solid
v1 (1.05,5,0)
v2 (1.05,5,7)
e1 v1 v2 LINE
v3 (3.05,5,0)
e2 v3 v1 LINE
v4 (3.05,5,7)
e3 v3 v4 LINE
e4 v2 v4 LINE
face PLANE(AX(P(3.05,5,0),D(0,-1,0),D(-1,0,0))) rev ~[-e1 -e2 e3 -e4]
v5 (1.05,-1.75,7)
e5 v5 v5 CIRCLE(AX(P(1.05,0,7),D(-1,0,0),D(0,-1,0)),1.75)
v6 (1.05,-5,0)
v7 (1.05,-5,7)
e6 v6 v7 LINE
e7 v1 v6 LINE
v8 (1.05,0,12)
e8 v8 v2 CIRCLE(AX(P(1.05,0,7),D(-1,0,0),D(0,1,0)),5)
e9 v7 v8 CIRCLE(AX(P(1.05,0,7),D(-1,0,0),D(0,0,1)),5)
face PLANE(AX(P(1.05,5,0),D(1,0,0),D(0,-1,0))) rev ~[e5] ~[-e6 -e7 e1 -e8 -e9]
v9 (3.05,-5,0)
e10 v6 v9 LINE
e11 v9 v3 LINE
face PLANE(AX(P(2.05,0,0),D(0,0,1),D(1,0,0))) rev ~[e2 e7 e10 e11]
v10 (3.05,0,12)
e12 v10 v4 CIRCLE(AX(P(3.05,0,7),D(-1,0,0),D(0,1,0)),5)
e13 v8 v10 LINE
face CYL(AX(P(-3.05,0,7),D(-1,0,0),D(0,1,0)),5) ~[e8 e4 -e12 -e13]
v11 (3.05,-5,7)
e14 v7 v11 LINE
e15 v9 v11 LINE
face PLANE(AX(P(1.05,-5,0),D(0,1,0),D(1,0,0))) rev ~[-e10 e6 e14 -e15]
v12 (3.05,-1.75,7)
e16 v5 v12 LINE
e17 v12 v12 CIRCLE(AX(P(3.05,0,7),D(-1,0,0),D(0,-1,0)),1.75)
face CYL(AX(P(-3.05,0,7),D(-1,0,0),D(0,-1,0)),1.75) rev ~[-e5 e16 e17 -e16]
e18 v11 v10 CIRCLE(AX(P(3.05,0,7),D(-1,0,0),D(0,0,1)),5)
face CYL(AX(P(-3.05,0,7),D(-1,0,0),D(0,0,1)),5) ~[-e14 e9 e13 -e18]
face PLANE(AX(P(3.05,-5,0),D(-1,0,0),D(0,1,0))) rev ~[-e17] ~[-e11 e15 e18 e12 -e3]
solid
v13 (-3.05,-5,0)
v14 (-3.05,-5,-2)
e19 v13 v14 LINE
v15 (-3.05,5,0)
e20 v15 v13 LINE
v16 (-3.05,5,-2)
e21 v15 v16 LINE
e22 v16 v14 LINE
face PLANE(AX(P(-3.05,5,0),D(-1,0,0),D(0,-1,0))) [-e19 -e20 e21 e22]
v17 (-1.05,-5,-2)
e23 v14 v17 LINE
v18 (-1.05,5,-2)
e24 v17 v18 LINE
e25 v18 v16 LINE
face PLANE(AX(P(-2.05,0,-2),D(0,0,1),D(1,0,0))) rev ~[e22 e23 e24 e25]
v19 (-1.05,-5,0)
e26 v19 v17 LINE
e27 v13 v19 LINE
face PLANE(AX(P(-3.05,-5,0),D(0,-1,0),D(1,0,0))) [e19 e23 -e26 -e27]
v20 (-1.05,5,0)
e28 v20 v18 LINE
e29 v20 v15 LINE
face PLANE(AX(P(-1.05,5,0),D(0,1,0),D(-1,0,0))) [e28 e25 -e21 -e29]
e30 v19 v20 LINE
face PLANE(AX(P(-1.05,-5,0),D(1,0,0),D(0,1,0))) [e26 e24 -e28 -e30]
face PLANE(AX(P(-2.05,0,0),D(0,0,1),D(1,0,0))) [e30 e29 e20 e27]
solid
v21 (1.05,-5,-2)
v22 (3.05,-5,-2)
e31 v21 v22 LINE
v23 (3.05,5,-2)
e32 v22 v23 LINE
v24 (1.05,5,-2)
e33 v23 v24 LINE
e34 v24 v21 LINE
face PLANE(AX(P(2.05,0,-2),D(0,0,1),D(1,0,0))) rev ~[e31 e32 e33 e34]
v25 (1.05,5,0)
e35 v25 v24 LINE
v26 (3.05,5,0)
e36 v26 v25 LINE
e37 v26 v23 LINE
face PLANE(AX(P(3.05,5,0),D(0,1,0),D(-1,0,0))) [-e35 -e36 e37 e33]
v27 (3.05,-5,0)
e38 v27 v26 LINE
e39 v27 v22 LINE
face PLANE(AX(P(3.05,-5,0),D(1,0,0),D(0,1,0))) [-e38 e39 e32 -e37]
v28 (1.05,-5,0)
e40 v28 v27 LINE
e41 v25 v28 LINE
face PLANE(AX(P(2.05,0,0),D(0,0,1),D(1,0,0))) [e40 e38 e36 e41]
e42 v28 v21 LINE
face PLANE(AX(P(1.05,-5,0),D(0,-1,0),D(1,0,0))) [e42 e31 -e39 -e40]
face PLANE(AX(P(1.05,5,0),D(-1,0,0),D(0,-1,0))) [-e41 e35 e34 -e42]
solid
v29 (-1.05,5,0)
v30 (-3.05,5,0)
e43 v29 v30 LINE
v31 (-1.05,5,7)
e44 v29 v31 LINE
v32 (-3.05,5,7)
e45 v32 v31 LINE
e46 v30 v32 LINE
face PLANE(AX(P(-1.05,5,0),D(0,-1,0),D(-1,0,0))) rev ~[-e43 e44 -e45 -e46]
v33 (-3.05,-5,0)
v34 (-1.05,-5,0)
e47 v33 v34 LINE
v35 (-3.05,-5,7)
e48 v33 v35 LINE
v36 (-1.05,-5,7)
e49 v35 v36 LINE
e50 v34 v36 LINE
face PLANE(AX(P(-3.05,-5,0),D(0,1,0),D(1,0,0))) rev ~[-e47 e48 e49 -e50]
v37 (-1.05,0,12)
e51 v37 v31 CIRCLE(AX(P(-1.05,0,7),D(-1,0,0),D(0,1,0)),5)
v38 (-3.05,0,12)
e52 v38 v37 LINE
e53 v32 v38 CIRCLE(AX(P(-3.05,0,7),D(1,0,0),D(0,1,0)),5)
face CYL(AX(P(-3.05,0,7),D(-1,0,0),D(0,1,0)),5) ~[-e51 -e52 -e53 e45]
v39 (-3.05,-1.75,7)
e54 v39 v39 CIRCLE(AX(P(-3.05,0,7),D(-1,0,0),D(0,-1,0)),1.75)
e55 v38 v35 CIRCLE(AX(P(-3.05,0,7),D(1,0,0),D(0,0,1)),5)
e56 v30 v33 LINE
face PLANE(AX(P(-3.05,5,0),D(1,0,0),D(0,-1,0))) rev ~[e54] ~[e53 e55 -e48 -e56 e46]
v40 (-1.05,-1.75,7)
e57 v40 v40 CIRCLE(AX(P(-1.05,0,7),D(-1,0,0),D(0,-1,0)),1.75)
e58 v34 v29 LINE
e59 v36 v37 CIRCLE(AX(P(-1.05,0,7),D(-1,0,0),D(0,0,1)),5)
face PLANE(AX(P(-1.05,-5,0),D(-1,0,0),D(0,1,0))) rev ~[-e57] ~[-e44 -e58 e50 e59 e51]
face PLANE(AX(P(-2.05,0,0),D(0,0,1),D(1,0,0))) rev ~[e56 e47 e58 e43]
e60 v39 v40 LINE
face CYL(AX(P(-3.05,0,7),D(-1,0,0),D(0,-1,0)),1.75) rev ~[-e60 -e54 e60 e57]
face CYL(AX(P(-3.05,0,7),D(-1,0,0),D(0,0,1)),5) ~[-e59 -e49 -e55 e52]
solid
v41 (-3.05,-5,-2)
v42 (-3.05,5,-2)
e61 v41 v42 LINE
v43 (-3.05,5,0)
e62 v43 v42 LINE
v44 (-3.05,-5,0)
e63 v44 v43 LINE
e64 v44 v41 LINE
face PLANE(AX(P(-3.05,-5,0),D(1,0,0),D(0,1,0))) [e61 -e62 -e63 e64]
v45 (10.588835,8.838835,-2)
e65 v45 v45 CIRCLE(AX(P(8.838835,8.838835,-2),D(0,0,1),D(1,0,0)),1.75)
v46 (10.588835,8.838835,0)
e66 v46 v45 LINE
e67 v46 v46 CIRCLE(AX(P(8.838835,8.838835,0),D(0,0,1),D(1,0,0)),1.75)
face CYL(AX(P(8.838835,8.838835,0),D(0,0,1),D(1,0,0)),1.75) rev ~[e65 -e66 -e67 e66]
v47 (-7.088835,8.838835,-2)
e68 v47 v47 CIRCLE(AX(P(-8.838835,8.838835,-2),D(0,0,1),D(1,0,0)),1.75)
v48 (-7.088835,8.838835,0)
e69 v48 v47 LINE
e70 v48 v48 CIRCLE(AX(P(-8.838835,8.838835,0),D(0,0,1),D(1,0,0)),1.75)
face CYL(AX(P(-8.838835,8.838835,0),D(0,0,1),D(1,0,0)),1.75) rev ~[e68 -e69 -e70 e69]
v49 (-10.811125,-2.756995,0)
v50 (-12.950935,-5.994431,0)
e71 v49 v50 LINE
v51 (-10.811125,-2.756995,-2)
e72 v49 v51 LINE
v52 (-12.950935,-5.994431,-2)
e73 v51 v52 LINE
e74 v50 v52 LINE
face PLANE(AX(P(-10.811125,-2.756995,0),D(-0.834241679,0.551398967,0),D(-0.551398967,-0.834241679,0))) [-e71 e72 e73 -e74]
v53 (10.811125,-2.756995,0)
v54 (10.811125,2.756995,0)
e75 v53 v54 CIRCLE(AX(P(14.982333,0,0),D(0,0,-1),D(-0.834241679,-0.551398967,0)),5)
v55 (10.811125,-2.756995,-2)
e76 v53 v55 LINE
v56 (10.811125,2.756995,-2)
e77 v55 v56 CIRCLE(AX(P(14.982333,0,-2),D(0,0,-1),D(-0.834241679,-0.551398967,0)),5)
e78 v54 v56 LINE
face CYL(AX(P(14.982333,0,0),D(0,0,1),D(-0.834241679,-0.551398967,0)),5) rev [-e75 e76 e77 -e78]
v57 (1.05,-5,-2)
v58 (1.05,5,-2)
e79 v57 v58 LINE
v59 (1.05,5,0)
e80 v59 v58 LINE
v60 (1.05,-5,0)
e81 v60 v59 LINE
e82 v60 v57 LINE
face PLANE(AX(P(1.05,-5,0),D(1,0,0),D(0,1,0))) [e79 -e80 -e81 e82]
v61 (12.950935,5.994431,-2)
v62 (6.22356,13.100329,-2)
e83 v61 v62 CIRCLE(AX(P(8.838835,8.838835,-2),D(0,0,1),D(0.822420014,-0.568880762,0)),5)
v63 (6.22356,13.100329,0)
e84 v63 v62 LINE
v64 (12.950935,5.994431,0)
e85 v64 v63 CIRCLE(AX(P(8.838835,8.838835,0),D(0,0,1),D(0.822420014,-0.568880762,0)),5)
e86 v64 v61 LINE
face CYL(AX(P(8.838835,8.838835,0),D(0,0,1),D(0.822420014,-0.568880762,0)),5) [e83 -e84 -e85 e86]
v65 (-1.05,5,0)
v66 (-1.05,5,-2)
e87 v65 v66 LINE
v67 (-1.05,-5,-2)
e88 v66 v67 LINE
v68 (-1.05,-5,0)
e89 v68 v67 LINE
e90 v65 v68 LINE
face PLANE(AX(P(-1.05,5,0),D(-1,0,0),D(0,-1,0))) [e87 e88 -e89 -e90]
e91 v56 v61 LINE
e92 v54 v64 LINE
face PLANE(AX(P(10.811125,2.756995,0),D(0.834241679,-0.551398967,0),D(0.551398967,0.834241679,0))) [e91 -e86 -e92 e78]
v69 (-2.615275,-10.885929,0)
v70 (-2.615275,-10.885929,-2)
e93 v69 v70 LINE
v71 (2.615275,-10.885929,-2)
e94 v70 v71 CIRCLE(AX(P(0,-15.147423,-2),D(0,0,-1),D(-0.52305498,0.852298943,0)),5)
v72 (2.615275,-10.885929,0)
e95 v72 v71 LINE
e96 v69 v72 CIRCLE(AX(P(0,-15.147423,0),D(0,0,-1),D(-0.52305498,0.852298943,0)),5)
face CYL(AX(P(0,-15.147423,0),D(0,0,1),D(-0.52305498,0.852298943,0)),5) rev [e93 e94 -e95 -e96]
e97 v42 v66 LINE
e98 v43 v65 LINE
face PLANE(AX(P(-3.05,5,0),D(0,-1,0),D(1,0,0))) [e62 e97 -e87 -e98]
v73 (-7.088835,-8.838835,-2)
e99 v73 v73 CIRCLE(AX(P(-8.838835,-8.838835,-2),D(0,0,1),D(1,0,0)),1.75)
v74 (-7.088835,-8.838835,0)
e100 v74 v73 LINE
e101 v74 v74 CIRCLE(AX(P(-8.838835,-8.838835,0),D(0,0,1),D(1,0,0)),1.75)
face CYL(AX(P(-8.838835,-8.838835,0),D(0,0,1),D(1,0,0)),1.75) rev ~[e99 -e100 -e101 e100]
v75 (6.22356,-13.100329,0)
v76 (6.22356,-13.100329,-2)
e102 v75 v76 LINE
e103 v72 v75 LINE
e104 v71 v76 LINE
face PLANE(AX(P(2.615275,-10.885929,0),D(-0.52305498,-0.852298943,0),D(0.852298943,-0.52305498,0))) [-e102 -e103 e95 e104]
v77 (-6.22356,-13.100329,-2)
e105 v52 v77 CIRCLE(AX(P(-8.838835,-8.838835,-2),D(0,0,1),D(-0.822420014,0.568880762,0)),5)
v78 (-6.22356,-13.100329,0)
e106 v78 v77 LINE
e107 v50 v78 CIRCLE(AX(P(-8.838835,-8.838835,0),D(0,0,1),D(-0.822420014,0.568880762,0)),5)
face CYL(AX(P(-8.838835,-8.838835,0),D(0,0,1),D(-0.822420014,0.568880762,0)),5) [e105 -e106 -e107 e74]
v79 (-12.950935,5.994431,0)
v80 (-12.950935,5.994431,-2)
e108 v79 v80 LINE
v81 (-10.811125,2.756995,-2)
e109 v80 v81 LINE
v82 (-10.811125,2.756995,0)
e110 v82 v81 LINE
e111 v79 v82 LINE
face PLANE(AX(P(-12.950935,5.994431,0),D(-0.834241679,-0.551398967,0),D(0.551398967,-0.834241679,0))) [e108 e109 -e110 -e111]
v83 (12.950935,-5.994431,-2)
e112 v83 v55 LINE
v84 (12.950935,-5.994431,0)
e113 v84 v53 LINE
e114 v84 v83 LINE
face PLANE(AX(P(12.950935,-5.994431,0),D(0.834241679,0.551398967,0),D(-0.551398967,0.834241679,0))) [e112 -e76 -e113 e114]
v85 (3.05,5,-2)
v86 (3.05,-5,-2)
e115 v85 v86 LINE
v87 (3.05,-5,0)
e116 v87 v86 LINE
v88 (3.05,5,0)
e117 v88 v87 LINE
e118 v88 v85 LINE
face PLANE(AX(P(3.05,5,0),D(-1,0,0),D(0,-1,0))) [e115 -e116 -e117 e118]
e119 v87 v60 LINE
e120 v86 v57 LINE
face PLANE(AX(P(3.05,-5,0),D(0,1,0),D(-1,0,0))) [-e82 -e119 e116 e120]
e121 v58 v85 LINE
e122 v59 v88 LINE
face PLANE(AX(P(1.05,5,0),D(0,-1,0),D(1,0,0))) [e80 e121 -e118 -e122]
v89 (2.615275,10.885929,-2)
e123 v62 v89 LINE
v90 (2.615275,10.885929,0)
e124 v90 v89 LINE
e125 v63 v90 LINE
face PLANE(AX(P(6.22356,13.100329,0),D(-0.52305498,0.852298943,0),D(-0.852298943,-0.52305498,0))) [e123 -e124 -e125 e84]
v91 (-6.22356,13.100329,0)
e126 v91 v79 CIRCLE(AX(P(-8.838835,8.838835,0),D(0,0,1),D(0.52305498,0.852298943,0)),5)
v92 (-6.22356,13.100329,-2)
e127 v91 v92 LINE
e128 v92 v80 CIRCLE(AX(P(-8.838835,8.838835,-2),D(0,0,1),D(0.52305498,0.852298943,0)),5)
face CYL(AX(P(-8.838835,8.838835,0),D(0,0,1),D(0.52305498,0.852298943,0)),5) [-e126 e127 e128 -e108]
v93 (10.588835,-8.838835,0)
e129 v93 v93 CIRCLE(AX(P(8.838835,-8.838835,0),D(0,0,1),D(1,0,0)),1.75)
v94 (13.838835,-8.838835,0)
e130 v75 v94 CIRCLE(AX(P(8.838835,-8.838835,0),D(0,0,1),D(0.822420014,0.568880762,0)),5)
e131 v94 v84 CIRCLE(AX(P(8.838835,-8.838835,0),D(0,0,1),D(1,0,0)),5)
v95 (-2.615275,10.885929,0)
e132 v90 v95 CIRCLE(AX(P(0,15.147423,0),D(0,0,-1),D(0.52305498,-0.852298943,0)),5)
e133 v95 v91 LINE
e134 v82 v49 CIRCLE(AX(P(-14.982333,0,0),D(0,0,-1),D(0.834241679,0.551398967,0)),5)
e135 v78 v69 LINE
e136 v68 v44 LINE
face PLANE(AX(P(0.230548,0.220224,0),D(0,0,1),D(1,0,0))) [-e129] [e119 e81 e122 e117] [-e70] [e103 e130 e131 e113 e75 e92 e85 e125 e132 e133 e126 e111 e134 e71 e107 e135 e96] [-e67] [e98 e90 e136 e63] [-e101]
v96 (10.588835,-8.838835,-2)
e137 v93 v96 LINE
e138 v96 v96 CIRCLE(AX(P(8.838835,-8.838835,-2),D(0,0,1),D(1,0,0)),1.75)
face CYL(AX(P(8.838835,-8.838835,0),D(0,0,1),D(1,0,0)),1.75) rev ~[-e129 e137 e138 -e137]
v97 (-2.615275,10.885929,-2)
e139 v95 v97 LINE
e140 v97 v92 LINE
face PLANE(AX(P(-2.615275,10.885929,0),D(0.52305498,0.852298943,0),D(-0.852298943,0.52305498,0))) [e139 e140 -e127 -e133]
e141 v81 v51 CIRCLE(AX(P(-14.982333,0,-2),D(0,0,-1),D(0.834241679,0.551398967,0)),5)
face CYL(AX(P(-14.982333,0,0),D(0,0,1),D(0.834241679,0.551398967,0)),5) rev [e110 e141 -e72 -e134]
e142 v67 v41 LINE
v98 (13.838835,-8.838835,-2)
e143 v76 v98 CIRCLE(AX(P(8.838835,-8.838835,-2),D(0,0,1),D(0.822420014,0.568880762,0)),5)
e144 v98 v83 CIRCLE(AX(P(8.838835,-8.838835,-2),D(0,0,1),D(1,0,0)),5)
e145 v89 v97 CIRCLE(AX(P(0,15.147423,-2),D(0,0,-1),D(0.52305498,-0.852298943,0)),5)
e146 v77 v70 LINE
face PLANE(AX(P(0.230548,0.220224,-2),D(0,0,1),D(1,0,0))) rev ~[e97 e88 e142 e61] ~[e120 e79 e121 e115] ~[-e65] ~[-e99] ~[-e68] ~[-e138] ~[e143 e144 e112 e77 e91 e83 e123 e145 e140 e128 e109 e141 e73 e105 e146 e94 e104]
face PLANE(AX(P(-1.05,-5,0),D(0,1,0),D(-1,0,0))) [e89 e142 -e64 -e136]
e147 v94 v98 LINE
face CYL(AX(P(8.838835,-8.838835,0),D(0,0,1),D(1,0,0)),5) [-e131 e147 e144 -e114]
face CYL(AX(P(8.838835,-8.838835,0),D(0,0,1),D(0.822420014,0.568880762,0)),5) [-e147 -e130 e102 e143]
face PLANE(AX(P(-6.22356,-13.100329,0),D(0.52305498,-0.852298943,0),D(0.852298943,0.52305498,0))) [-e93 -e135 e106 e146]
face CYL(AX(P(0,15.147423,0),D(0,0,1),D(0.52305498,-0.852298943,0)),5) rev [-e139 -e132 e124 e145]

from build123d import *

# Parameters (mm, degrees)
F1_DEPTH = 12
F2_DEPTH = 2
F3_R     = 1.75
F4_DEPTH = 25
F0_R     = 1.75
F5_DEPTH = 2


# Not quite as in the source:
# - a feature names something its author has since deleted; it is built from what else it names


with BuildPart() as f1:
    # F0 (on Top) → F1 (new body)
    with BuildSketch(Plane.XY):
        Polygon((-3.05, 5), (-3.05, 0), (-3.05, -5), (-1.05, -5), (-1.05, 0), (-1.05, 5), align=None)
    extrude(amount=F1_DEPTH)


with BuildPart() as f1b:
    # F0 (on Top) → F1, piece 2 (new body)
    with BuildSketch(Plane.XY):
        Polygon((3.05, 0), (3.05, 5), (1.05, 5), (1.05, 0), (1.05, -5), (3.05, -5), align=None)
    extrude(amount=F1_DEPTH)


with BuildPart() as f2:
    # F0 (on Top) → F2 (new body)
    with BuildSketch(Plane.XY):
        Polygon((-3.05, 5), (-3.05, 0), (-3.05, -5), (-1.05, -5), (-1.05, 0), (-1.05, 5), align=None)
    extrude(amount=-F2_DEPTH)


with BuildPart() as f2b:
    # F0 (on Top) → F2, piece 2 (new body)
    with BuildSketch(Plane.XY):
        Polygon((3.05, 0), (3.05, 5), (1.05, 5), (1.05, 0), (1.05, -5), (3.05, -5), align=None)
    extrude(amount=-F2_DEPTH)


with BuildPart() as f4_tool:
    # F3 (on face) → F4 (new body)
    with BuildSketch(Plane(origin=(-3.05, 0, 0), x_dir=(0, -1, 0), z_dir=(-1, 0, 0))):
        with BuildLine():
            ThreePointArc((-5, 7), (-3.5355339059, 10.5355339059), (0, 12))
            Line((0, 12), (-5, 12))
            Line((-5, 12), (-5, 7))
        make_face()
        with Locations((0, 7)):
            Circle(F3_R)
        with BuildLine():
            ThreePointArc((0, 12), (3.5355339059, 10.5355339059), (5, 7))
            Line((5, 7), (5, 12))
            Line((5, 12), (0, 12))
        make_face()
    extrude(amount=-F4_DEPTH)


with BuildPart() as f1_1:
    add(f1.part)

    # F4: cut by f4_tool
    add(f4_tool.part, mode=Mode.SUBTRACT)


with BuildPart() as f1b_1:
    add(f1b.part)

    # F4: cut by f4_tool
    add(f4_tool.part, mode=Mode.SUBTRACT)


with BuildPart() as f5:
    # F0 (on Top) → F5 (new body)
    with BuildSketch(Plane.XY):
        with BuildLine():
            Line((10.8111245395, 2.756994834), (12.9509348337, 5.9944309568))
            ThreePointArc((12.9509348337, 5.9944309568), (12.4697533606, 12.2763382413), (6.2235598652, 13.1003294791))
            Line((6.2235598652, 13.1003294791), (2.6152748996, 10.8859287267))
            ThreePointArc((2.6152748996, 10.8859287267), (0, 10.147423441), (-2.6152748996, 10.8859287267))
            Line((-2.6152748996, 10.8859287267), (-6.2235598652, 13.1003294791))
            ThreePointArc((-6.2235598652, 13.1003294791), (-4.4755576422, 11.2805171256), (-3.8388347648, 8.8388347648))
            ThreePointArc((-3.8388347648, 8.8388347648), (-7.3489522769, 4.0659687315), (-12.9509348337, 5.9944309568))
            Line((-12.9509348337, 5.9944309568), (-10.8111245395, 2.756994834))
            ThreePointArc((-10.8111245395, 2.756994834), (-9.9823329358, 0), (-10.8111245395, -2.756994834))
            Line((-10.8111245395, -2.756994834), (-12.9509348337, -5.9944309568))
            ThreePointArc((-12.9509348337, -5.9944309568), (-7.3489522769, -4.0659687315), (-3.8388347648, -8.8388347648))
            ThreePointArc((-3.8388347648, -8.8388347648), (-4.4755576422, -11.2805171256), (-6.2235598652, -13.1003294791))
            Line((-6.2235598652, -13.1003294791), (-2.6152748996, -10.8859287267))
            ThreePointArc((-2.6152748996, -10.8859287267), (0, -10.147423441), (2.6152748996, -10.8859287267))
            Line((2.6152748996, -10.8859287267), (6.2235598652, -13.1003294791))
            ThreePointArc((6.2235598652, -13.1003294791), (5.2079161691, -5.4013312883), (12.9509348337, -5.9944309568))
            Line((12.9509348337, -5.9944309568), (10.8111245395, -2.756994834))
            ThreePointArc((10.8111245395, -2.756994834), (9.9823329358, 0), (10.8111245395, 2.756994834))
        make_face()
        Polygon((-3.05, -5), (-3.05, 0), (-3.05, 5), (-1.05, 5), (-1.05, 0), (-1.05, -5), align=None, mode=Mode.SUBTRACT)
        Polygon((1.05, 5), (3.05, 5), (3.05, 0), (3.05, -5), (1.05, -5), (1.05, 0), align=None, mode=Mode.SUBTRACT)
        with Locations((8.8388347648, 8.8388347648)):
            Circle(F0_R, mode=Mode.SUBTRACT)
        with BuildLine():
            ThreePointArc((13.8388347648, -8.8388347648), (13.6117007982, -7.3489522769), (12.9509348337, -5.9944309568))
            ThreePointArc((12.9509348337, -5.9944309568), (5.2079161691, -5.4013312883), (6.2235598652, -13.1003294791))
            ThreePointArc((6.2235598652, -13.1003294791), (11.2805171256, -13.2021118875), (13.8388347648, -8.8388347648))
        make_face()
        with Locations((8.8388347648, -8.8388347648)):
            Circle(F0_R, mode=Mode.SUBTRACT)
        with BuildLine():
            ThreePointArc((-3.8388347648, 8.8388347648), (-4.4755576422, 11.2805171256), (-6.2235598652, 13.1003294791))
            ThreePointArc((-6.2235598652, 13.1003294791), (-12.4697533606, 12.2763382413), (-12.9509348337, 5.9944309568))
            ThreePointArc((-12.9509348337, 5.9944309568), (-7.3489522769, 4.0659687315), (-3.8388347648, 8.8388347648))
        make_face()
        with Locations((-8.8388347648, 8.8388347648)):
            Circle(F0_R, mode=Mode.SUBTRACT)
        with BuildLine():
            ThreePointArc((-12.9509348337, -5.9944309568), (-12.4697533606, -12.2763382413), (-6.2235598652, -13.1003294791))
            ThreePointArc((-6.2235598652, -13.1003294791), (-4.4755576422, -11.2805171256), (-3.8388347648, -8.8388347648))
            ThreePointArc((-3.8388347648, -8.8388347648), (-7.3489522769, -4.0659687315), (-12.9509348337, -5.9944309568))
        make_face()
        with Locations((-8.8388347648, -8.8388347648)):
            Circle(F0_R, mode=Mode.SUBTRACT)
    extrude(amount=-F5_DEPTH)


solid = Compound([f2.part, f2b.part, f1_1.part, f1b_1.part, f5.part])
